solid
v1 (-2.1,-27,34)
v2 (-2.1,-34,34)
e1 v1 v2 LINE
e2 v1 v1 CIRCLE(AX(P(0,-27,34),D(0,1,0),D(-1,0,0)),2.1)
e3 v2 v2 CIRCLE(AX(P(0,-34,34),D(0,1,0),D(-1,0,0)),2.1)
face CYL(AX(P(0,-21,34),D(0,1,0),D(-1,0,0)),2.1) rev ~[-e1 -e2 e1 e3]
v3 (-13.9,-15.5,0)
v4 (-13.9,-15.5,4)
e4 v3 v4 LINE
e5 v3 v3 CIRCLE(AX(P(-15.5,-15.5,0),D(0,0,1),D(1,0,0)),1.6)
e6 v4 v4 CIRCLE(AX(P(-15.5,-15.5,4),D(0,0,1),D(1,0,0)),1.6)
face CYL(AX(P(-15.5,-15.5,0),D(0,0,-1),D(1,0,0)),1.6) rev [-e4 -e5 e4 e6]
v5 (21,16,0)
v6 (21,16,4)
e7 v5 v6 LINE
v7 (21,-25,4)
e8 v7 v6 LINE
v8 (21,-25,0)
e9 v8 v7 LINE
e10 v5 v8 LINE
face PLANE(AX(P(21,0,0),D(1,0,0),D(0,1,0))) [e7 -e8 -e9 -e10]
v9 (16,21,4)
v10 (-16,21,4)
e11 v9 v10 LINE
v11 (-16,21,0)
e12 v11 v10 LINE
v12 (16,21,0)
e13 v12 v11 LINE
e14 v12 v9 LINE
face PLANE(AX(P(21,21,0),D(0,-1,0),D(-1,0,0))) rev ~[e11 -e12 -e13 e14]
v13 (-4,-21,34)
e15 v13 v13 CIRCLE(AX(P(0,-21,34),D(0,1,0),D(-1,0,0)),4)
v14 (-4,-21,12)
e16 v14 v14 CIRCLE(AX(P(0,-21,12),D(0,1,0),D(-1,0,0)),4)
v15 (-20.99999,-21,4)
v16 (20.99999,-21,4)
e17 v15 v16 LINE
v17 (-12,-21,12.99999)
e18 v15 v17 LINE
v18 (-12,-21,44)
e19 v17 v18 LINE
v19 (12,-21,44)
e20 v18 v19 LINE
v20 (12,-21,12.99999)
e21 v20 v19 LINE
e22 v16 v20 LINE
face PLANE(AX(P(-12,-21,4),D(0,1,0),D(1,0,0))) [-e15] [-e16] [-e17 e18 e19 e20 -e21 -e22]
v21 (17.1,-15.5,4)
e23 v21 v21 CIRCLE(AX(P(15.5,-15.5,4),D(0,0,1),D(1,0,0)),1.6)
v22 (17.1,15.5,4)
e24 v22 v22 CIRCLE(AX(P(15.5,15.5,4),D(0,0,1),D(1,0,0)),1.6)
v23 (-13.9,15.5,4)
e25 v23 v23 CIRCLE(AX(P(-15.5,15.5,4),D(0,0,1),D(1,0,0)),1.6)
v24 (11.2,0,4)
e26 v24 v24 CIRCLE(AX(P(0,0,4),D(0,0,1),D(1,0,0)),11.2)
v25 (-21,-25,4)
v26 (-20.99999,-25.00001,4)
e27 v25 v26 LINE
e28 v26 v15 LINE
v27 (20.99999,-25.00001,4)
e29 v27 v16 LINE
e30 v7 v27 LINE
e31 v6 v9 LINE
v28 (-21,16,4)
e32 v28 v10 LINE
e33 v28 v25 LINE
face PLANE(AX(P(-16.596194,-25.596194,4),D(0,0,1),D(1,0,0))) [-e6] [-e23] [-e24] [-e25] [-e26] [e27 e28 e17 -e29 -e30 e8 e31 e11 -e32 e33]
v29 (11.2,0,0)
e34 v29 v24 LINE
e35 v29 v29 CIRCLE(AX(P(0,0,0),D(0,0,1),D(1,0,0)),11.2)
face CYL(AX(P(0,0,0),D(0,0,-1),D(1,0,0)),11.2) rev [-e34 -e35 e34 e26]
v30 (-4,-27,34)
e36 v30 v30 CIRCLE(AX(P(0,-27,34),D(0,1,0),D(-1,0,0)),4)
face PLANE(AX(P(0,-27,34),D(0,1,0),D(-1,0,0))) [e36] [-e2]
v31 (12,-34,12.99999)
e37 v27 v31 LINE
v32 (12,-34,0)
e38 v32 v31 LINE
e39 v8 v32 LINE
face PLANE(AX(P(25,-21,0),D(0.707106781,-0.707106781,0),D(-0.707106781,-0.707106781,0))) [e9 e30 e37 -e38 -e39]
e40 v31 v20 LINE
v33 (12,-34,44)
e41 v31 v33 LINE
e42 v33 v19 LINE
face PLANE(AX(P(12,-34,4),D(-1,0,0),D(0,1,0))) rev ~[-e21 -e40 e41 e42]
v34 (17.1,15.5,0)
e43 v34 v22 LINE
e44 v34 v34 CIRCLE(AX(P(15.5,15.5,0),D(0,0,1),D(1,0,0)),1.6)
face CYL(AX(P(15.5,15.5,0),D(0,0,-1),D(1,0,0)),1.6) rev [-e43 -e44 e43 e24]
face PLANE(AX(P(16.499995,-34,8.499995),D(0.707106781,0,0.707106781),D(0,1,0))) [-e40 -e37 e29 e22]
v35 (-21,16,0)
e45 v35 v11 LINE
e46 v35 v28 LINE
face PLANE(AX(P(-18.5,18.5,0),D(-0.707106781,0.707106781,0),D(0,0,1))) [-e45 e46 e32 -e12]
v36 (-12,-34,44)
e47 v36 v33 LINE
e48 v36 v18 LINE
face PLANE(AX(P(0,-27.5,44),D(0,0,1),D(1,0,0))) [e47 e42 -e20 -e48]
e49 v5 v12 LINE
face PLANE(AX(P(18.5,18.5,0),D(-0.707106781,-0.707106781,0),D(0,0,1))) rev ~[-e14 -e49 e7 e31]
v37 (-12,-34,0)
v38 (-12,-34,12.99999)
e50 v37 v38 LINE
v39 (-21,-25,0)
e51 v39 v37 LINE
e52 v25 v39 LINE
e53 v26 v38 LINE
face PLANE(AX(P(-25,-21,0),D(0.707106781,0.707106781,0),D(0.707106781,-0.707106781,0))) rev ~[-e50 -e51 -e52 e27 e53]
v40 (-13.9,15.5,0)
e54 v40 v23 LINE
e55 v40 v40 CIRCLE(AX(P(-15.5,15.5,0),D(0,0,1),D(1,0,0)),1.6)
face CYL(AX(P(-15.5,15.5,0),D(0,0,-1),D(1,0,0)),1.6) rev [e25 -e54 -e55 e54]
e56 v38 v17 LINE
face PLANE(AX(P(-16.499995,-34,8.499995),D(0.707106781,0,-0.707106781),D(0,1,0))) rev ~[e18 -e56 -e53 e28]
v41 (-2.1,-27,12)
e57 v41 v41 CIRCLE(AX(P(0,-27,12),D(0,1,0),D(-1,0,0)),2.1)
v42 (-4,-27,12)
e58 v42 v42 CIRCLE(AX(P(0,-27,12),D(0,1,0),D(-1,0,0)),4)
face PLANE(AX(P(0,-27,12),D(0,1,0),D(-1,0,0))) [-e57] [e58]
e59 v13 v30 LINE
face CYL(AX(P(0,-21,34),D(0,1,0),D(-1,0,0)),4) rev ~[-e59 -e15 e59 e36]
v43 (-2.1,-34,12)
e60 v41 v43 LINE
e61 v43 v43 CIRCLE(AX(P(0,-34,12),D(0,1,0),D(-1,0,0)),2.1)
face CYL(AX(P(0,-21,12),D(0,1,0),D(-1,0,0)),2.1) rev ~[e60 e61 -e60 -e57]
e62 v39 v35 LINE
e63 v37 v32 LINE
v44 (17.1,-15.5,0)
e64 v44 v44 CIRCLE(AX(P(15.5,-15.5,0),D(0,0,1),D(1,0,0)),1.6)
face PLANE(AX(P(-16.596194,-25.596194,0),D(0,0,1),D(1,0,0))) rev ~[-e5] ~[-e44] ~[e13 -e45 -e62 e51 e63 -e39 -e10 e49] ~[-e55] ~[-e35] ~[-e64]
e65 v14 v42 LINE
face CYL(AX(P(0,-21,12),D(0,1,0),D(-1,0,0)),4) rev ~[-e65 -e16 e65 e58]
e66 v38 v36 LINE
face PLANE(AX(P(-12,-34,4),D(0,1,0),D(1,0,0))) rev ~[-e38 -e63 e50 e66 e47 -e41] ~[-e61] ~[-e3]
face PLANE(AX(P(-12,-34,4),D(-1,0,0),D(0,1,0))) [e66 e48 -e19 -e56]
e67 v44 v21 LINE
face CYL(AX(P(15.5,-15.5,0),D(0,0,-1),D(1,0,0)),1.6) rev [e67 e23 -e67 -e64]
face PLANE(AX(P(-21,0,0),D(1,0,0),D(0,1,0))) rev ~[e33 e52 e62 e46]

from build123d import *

# Parameters (mm, degrees)
F0_R        = 1.6
F0_R_2      = 11.2
F0_W        = 24
F0_H        = 13
F1_DEPTH    = 4
F2_W        = 24
F2_H        = 13
F3_DEPTH    = 40
F4_T4_DEPTH = 4
F4_T9_DEPTH = 4
F5_SIZE     = 8.99999
F6_R        = 2.1
F7_DEPTH    = 25
F6_R_2      = 4
F8_DEPTH    = 6
F9_SIZE     = 5


# Not quite as in the source:
# - a fillet or chamfer that OpenCascade refuses, or shapes differently, is made with other operations: its cross-section is extruded or revolved along the edge and cut away or added
# - a fillet or chamfer is up to 0.001 mm smaller than in the source, because OpenCascade refuses the exact size


with BuildPart() as f1:
    # F0 (on Top) → F1 (new body)
    with BuildSketch(Plane.XY):
        Polygon((12, -21), (21, -21), (21, 21), (-21, 21), (-21, -21), (-12, -21), align=None)
        with Locations((-15.5, -15.5)):
            Circle(F0_R, mode=Mode.SUBTRACT)
        with Locations((15.5, -15.5)):
            Circle(F0_R, mode=Mode.SUBTRACT)
        with Locations((-15.5, 15.5)):
            Circle(F0_R, mode=Mode.SUBTRACT)
        Circle(F0_R_2, mode=Mode.SUBTRACT)
        with Locations((15.5, 15.5)):
            Circle(F0_R, mode=Mode.SUBTRACT)
        with Locations((0, -27.5)):
            Rectangle(F0_W, F0_H)
    extrude(amount=F1_DEPTH)

    # F2 (on face) → F3 (join)
    with BuildSketch(Plane.XY.offset(4)):
        with Locations((0, -27.5)):
            Rectangle(F2_W, F2_H)
    extrude(amount=F3_DEPTH)

    # F4: chamfer of 13 on 2 edges, made by hand


with BuildPart() as f4_tool2:
    # F4_s3 → F4_t4 (new body)
    with BuildSketch(Plane.XY):
        Polygon((25, -21), (12, -34), (12, -21), align=None)
    extrude(amount=F4_T4_DEPTH)

    split(bisect_by=Plane.YZ.offset(21), keep=Keep.BOTTOM)


with BuildPart() as f1_1:
    add(f1.part)

    # F4_t1: union F4_tool2
    add(f4_tool2.part)


with BuildPart() as f4_tool7:
    # F4_s8 → F4_t9 (new body)
    with BuildSketch(Plane.XY):
        Polygon((-25, -21), (-12, -34), (-12, -21), align=None)
    extrude(amount=F4_T9_DEPTH)

    split(bisect_by=Plane.YZ.offset(-21), keep=Keep.TOP)


with BuildPart() as f1_2:
    add(f1_1.part)

    # F4_t6: union F4_tool7
    add(f4_tool7.part)

    # F5 (size 9 in the source; OpenCascade refuses exactly that, so slightly less here)
    f5_edges = [f1_2.edges().sort_by_distance(p)[0] for p in [
        (12, -27.5, 4),
        (-12, -27.5, 4),
    ]]
    chamfer(f5_edges, length=F5_SIZE)

    # F6 (on face) → F7 (cut)
    with BuildSketch(Plane(origin=(0, -21, 0), x_dir=(-1, 0, 0), z_dir=(0, 1, 0))):
        with Locations((0, 34)):
            Circle(F6_R)
        with Locations((0, 12)):
            Circle(F6_R)
    extrude(amount=-F7_DEPTH, mode=Mode.SUBTRACT)

    # F6 (on face) → F8 (cut)
    with BuildSketch(Plane(origin=(0, -21, 0), x_dir=(-1, 0, 0), z_dir=(0, 1, 0))):
        with Locations((0, 34)):
            Circle(F6_R_2)
        with Locations((0, 34)):
            Circle(F6_R, mode=Mode.SUBTRACT)
        with Locations((0, 12)):
            Circle(F6_R_2)
        with Locations((0, 12)):
            Circle(F6_R, mode=Mode.SUBTRACT)
    extrude(amount=-F8_DEPTH, mode=Mode.SUBTRACT)

    # F9
    f9_edges = [f1_2.edges().sort_by_distance(p)[0] for p in [
        (21, 21, 2),
        (-21, 21, 2),
    ]]
    chamfer(f9_edges, length=F9_SIZE)


solid = f1_2.part
